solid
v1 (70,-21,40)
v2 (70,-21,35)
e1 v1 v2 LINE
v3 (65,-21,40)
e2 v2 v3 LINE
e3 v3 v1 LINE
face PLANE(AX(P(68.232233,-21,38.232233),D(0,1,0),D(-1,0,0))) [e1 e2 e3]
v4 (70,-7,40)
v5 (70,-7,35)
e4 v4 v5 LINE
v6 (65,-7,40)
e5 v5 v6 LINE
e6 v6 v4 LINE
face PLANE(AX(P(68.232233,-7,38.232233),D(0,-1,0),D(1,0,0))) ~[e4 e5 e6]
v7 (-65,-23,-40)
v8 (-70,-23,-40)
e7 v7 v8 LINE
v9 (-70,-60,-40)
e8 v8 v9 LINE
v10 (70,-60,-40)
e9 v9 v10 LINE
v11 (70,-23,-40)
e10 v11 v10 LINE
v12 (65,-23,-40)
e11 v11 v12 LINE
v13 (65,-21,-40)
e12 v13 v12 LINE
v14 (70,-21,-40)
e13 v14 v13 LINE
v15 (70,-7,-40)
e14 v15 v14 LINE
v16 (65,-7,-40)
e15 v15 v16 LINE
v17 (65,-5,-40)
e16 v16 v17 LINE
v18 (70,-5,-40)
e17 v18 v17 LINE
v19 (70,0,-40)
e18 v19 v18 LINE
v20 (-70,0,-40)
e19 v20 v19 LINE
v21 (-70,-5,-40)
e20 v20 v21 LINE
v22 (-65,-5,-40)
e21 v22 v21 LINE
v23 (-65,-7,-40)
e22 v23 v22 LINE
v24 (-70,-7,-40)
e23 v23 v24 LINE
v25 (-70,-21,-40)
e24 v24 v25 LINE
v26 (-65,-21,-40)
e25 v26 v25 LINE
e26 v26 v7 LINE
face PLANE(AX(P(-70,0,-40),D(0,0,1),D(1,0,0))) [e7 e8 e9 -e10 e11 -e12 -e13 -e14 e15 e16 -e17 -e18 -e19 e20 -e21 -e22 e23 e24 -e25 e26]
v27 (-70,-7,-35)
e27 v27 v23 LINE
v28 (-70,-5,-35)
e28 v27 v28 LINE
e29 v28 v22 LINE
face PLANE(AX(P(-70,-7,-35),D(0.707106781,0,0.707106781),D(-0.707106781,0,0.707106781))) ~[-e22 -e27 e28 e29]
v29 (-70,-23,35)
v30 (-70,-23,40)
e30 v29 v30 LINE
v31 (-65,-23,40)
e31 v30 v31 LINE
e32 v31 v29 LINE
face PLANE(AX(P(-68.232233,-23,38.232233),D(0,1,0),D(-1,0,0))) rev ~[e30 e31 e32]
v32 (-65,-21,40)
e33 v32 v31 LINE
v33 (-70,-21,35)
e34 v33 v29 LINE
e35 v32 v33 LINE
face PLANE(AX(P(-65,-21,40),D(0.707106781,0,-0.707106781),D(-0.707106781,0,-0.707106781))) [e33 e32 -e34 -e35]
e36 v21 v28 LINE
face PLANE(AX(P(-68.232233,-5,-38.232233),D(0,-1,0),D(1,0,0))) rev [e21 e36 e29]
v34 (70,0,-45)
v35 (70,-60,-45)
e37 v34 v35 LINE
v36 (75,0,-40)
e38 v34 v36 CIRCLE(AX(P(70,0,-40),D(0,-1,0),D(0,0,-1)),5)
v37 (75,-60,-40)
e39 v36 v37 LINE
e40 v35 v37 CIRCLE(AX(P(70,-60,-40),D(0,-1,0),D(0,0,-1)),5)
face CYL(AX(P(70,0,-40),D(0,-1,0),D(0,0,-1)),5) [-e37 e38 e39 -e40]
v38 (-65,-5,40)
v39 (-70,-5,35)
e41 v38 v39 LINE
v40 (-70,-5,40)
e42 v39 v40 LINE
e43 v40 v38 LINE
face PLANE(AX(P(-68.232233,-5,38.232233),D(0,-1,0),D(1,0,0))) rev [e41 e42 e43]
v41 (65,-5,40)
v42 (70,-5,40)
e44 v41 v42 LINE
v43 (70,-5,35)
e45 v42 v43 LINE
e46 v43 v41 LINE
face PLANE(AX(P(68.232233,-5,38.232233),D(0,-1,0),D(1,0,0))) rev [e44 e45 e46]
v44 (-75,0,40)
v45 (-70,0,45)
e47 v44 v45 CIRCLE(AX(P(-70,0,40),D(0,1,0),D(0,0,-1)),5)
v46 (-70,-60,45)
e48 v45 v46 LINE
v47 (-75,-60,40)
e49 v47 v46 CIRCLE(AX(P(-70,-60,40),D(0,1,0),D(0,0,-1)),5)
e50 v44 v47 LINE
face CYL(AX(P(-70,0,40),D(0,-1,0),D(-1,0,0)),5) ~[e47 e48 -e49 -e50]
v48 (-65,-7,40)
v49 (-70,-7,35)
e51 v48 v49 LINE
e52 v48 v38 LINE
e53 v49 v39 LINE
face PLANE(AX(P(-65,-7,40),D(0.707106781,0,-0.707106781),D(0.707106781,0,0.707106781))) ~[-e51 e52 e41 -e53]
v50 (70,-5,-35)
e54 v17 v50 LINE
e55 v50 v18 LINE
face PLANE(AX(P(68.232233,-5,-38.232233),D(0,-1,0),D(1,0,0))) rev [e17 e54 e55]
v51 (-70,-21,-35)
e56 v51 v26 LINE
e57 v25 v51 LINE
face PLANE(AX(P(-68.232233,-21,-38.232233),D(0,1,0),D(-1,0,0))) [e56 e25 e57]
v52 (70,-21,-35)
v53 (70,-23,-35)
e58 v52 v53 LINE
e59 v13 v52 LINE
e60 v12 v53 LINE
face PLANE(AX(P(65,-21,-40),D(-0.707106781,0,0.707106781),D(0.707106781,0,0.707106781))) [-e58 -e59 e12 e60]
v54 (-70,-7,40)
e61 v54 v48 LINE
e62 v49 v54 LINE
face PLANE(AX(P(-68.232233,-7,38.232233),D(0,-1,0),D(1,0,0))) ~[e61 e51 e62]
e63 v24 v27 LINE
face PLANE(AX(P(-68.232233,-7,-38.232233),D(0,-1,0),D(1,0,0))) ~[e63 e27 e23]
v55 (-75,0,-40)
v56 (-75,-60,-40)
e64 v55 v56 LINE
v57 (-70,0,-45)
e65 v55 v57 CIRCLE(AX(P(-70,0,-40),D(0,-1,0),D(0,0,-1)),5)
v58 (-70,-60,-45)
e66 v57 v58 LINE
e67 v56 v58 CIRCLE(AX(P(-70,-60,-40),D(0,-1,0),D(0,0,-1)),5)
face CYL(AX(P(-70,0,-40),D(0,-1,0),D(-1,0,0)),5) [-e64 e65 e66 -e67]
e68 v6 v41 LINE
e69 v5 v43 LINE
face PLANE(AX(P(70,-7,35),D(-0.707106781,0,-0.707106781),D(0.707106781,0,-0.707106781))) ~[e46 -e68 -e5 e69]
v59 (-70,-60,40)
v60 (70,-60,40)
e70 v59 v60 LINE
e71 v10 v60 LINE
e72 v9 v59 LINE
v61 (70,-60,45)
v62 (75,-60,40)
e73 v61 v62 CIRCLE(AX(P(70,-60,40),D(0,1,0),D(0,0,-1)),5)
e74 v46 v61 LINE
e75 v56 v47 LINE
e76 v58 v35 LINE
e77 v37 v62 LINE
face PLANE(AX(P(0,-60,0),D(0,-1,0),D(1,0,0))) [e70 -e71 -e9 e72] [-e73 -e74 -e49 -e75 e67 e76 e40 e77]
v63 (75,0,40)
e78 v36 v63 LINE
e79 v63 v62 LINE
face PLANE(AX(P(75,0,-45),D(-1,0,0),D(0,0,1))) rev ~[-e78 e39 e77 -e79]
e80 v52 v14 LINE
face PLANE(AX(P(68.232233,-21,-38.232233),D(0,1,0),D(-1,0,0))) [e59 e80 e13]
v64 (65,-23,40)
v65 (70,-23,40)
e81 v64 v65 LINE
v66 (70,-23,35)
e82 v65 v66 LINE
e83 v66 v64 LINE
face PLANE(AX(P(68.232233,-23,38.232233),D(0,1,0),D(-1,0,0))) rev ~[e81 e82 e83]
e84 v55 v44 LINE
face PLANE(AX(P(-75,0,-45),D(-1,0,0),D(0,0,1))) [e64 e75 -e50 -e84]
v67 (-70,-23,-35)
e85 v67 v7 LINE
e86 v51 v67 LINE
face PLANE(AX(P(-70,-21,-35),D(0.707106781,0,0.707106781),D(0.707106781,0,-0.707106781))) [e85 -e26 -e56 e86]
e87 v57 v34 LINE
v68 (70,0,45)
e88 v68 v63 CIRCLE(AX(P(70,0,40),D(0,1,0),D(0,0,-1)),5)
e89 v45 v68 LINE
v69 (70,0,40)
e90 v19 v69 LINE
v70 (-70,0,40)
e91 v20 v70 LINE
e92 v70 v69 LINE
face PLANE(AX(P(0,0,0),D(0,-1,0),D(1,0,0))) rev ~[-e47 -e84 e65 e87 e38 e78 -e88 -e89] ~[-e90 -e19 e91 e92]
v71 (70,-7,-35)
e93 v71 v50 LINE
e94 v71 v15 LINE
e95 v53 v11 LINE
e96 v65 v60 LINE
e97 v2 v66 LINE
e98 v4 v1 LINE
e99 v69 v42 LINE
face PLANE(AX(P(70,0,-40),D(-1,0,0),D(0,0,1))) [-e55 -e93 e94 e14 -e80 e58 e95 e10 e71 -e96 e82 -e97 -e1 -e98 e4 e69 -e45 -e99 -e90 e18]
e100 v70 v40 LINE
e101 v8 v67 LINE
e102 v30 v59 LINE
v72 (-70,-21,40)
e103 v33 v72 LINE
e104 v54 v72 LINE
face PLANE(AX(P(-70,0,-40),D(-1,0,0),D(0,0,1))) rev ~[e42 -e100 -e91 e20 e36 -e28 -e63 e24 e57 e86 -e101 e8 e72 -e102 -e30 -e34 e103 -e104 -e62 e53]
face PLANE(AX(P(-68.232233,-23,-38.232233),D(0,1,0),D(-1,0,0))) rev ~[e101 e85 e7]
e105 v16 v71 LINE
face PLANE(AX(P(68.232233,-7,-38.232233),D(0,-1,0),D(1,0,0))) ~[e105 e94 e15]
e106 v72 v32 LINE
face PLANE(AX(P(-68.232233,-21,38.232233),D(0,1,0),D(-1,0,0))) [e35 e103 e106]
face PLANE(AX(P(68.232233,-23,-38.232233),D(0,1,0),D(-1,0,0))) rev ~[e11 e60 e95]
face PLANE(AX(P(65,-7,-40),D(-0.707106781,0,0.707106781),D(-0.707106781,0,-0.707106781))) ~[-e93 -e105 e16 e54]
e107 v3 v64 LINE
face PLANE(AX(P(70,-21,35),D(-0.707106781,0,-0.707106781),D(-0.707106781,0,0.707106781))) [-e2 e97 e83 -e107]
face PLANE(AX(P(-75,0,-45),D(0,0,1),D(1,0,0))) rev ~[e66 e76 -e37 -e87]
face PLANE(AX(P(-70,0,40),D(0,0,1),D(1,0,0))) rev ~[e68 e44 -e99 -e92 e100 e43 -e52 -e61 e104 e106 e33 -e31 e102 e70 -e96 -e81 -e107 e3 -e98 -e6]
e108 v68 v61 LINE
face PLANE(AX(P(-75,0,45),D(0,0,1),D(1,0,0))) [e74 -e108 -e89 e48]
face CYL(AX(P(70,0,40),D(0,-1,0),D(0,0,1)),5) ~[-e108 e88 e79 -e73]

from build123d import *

# Parameters (mm, degrees)
F0_W     = 1500
F0_H     = 900
F0_W_2   = 1400
F0_H_2   = 800
F1_DEPTH = 600
F2_SCALE = 0.1
F6_DEPTH = 2
F7_R     = 5


# Not quite as in the source:
# - a pattern or mirror of a feature is missing from the dataset's text; its kind, count and spacing are read off the source's solid


with BuildPart() as f1:
    # F0 (on Front) → F1 (new body)
    with BuildSketch(Plane.XZ):
        Rectangle(F0_W, F0_H)
        Rectangle(F0_W_2, F0_H_2, mode=Mode.SUBTRACT)
    extrude(amount=F1_DEPTH)


with BuildPart() as f1_1:
    # F2: moved
    add(f1.part.scale(F2_SCALE))

    # F5 (on offset) → F6 (join)
    with BuildSketch(Plane(origin=(0, -21, 0), x_dir=(-1, 0, 0), z_dir=(0, 1, 0))):
        Polygon((-65, 40), (-70, 40), (-70, 35), align=None)
        Polygon((65, 40), (70, 35), (70, 40), align=None)
        Polygon((-70, -35), (-70, -40), (-65, -40), align=None)
        Polygon((65, -40), (70, -40), (70, -35), align=None)
    f6 = extrude(amount=-F6_DEPTH)

    # F6_copies: F6 across plane
    add(f6.mirror(Plane.ZX.offset(-14)))

    # F7
    f7_edges = [f1_1.edges().sort_by_distance(p)[0] for p in [
        (75, -30, 45),
        (75, -30, -45),
        (-75, -30, -45),
        (-75, -30, 45),
    ]]
    fillet(f7_edges, radius=F7_R)


solid = f1_1.part
